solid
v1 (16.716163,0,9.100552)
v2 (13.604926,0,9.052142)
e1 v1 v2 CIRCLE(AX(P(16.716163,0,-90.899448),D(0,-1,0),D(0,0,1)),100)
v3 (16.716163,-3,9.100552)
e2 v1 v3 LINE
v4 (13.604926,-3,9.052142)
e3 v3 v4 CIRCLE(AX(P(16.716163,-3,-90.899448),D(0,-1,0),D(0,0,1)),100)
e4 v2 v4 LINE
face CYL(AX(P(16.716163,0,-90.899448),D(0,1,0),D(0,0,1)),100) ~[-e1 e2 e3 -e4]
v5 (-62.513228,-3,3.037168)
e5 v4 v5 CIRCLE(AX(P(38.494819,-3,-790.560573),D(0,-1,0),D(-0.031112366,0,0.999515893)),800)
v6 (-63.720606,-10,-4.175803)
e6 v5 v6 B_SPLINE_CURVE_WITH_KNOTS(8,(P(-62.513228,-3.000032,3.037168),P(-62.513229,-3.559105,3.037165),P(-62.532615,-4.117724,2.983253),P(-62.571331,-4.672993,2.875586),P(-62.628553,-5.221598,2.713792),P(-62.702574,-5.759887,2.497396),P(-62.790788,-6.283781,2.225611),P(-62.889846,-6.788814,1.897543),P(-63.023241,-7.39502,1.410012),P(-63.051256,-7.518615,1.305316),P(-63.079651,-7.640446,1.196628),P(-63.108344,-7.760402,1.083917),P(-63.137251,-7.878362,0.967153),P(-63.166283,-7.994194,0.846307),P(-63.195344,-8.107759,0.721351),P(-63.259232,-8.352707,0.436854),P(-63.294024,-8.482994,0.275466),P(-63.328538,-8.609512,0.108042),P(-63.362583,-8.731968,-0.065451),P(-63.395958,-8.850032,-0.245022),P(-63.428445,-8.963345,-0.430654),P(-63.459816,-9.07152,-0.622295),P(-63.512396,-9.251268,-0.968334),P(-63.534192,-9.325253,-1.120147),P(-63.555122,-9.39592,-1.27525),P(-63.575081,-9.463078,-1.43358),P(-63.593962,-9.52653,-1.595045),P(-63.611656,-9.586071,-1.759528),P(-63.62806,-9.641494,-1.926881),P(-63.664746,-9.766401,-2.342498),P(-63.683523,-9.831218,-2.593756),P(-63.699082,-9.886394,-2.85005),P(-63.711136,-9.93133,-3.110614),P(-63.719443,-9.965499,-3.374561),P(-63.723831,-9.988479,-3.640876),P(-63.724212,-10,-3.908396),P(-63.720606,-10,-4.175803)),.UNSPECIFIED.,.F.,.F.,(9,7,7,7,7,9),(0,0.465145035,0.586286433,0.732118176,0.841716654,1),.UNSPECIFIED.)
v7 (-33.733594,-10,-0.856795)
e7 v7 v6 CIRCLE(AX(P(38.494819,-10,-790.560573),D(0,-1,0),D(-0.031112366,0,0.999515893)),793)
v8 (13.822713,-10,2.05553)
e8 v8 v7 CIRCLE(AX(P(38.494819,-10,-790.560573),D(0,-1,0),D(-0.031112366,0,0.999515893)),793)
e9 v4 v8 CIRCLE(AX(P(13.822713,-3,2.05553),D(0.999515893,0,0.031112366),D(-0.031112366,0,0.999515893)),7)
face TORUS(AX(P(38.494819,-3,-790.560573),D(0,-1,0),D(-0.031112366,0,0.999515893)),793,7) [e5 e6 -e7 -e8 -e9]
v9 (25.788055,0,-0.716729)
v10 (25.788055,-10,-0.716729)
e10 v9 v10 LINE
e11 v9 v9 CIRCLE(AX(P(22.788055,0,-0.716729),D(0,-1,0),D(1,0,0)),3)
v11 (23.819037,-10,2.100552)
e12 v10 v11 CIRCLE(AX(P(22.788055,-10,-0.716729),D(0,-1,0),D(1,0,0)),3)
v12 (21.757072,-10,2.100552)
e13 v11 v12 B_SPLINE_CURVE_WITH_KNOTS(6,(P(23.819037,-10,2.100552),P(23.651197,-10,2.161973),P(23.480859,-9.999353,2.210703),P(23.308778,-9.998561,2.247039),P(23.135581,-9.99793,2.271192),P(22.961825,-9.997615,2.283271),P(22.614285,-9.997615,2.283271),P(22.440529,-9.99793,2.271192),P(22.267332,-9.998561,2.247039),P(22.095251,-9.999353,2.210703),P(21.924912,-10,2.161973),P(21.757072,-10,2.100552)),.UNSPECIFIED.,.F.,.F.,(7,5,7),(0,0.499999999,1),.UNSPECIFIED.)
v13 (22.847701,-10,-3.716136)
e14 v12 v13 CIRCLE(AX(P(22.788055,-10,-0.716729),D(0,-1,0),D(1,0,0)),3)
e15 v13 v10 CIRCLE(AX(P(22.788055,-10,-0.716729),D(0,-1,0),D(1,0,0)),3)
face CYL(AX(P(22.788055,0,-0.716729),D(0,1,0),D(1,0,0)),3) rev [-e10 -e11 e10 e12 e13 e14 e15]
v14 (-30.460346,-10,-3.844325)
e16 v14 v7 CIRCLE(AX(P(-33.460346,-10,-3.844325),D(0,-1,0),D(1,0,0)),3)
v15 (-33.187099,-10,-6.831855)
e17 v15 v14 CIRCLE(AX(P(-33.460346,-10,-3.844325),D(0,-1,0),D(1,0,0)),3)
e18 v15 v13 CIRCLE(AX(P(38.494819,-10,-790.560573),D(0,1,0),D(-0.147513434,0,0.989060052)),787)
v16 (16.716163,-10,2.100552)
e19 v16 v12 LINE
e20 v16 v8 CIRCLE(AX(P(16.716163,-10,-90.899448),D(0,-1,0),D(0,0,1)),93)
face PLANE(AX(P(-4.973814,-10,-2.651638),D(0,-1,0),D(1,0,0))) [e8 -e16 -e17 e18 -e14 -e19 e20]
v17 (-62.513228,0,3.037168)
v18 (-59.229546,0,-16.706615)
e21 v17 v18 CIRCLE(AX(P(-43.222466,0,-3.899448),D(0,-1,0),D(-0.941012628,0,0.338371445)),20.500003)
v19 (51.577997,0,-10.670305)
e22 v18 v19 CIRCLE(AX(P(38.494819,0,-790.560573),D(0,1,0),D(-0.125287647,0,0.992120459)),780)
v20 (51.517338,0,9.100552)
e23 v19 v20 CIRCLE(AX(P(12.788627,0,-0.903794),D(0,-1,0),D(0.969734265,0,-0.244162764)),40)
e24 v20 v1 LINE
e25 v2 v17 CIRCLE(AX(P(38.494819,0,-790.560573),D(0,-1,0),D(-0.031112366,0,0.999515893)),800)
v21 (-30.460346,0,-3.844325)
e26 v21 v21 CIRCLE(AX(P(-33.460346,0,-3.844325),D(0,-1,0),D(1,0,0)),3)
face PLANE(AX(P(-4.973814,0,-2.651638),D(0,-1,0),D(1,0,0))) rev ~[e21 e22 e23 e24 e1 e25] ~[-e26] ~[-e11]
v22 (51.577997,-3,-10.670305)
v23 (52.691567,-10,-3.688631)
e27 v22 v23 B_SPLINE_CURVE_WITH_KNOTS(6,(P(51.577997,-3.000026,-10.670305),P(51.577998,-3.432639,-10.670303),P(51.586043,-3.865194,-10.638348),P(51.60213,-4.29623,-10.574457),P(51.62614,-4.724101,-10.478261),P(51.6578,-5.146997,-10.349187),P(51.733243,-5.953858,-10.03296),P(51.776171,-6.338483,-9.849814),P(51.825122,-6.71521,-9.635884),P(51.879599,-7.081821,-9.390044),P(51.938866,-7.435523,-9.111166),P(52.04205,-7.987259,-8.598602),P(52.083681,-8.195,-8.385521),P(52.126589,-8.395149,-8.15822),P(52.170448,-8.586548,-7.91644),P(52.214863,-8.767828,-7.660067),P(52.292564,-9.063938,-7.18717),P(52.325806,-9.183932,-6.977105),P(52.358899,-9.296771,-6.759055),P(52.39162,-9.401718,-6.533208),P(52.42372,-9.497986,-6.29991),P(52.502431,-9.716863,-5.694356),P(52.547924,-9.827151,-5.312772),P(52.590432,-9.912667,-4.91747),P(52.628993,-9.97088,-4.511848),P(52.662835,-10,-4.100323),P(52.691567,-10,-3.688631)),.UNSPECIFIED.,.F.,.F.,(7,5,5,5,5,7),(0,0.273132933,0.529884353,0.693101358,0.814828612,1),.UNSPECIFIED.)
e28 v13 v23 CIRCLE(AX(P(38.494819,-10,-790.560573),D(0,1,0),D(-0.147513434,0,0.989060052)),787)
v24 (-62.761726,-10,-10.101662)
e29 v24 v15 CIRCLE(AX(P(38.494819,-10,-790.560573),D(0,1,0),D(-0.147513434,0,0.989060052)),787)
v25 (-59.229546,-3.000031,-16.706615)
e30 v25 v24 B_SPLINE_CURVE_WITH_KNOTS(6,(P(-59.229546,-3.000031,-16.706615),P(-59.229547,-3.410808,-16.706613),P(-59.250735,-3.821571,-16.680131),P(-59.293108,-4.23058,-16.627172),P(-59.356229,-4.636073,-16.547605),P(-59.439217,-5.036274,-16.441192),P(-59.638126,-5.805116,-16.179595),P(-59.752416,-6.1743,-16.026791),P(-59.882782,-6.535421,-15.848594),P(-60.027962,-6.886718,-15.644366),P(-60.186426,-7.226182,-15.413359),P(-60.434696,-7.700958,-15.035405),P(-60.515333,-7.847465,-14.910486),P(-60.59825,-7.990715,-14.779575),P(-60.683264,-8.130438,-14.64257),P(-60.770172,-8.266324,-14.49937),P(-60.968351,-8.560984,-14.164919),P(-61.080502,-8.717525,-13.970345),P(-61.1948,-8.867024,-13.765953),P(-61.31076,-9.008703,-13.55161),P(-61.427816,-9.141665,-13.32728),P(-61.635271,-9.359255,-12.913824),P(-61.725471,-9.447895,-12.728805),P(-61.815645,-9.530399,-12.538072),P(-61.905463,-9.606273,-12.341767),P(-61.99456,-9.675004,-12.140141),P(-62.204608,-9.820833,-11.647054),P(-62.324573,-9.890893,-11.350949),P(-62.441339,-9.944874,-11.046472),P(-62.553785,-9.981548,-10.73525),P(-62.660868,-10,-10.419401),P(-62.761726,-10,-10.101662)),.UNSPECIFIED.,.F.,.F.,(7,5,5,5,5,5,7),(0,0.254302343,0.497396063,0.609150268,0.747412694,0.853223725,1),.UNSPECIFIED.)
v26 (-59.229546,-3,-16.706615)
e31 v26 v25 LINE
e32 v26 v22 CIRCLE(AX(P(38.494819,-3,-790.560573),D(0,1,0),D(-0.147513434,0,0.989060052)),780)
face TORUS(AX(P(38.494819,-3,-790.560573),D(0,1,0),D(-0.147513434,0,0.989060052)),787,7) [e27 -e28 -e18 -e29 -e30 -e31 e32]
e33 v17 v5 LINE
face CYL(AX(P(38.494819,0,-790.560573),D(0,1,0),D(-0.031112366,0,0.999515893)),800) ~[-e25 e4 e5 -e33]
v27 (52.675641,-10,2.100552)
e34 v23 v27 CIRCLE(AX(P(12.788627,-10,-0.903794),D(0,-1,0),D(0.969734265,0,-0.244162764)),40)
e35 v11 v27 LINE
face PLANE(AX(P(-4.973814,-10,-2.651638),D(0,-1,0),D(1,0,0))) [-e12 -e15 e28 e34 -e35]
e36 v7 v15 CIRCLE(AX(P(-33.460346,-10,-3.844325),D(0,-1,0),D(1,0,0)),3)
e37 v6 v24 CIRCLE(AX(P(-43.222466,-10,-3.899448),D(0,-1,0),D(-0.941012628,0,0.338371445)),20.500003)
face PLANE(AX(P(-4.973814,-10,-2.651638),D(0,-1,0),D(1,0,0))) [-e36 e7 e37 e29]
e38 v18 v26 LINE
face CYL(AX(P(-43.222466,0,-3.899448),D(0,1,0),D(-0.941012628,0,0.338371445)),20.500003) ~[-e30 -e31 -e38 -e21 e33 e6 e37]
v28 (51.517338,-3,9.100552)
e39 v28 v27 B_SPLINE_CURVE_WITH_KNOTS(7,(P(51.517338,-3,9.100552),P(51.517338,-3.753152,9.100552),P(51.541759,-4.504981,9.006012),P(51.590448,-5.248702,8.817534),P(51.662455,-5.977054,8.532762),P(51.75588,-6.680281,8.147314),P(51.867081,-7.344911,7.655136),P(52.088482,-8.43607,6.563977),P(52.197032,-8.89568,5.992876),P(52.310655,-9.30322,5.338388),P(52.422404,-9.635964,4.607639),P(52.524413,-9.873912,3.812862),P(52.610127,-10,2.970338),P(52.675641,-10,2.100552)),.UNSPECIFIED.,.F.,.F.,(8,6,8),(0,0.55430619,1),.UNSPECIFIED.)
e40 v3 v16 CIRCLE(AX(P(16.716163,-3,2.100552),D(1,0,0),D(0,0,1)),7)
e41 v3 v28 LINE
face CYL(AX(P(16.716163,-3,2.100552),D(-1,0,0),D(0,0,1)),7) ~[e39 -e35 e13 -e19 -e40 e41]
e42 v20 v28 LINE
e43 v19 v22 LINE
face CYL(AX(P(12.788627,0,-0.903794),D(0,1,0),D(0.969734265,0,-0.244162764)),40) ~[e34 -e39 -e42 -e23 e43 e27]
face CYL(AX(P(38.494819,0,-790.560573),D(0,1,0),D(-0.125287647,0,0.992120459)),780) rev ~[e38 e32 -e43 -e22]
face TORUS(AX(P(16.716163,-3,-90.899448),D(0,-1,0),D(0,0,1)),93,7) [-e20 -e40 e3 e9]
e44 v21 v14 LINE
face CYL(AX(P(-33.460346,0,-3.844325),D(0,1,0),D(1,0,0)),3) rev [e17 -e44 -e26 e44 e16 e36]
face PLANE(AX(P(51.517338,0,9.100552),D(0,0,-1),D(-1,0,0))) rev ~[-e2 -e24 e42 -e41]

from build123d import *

# Parameters (mm, degrees)
F0_R        = 3
F1_DEPTH    = 10
F2_T1_DEPTH = 52.3011751173
F2_T4_ANGLE = 6.7239804363
F2_T6_ANGLE = 10.729424982
F2_T8_ANGLE = 1.7828949869


# Not quite as in the source:
# - a fillet or chamfer that OpenCascade refuses, or shapes differently, is made with other operations: its cross-section is extruded or revolved along the edge and cut away or added


with BuildPart() as f1:
    # F0 (on Front) → F1 (new body)
    with BuildSketch(Plane.XZ):
        with BuildLine():
            ThreePointArc((16.7161625637, 9.1005522793), (15.1603559483, 9.0884488757), (13.604925944, 9.0521415948))
            ThreePointArc((13.604925944, 9.0521415948), (-24.5259537531, 6.9533029462), (-62.5132279063, 3.0371680453))
            ThreePointArc((-62.5132279063, 3.0371680453), (-63.4446975244, -7.2627028514), (-59.2295458713, -16.7066147888))
            ThreePointArc((-59.2295458713, -16.7066147888), (-3.9332598443, -11.7153648591), (51.5779973344, -10.6703047235))
            ThreePointArc((51.5779973344, -10.6703047235), (52.7884384629, -0.7810693697), (51.517337681, 9.1005522793))
            Line((51.517337681, 9.1005522793), (16.7161625637, 9.1005522793))
        make_face()
        with Locations((-33.4603461426, -3.8443253384)):
            Circle(F0_R, mode=Mode.SUBTRACT)
        with Locations((22.7880547631, -0.7167291473)):
            Circle(F0_R, mode=Mode.SUBTRACT)
    extrude(amount=F1_DEPTH)

    # F2: fillet of radius 7 on 4 edges, made by hand

    # F2_s2 → F2_t1 (cut)
    with BuildSketch(Plane.YZ.offset(16.7161625637)):
        with BuildLine():
            ThreePointArc((-3, 9.1005522793), (-7.9497474683, 7.0502997476), (-10, 2.1005522793))
            Line((-10, 2.1005522793), (-10, 9.1005522793))
            Line((-10, 9.1005522793), (-3, 9.1005522793))
        make_face()
    extrude(amount=F2_T1_DEPTH, mode=Mode.SUBTRACT)

    # F2_s3 → F2_t4 (revolve, cut)
    with BuildSketch(Plane(origin=(13.8732538603, 0, 0.4318388106), x_dir=(0, 1, 0), z_dir=(0.9995158932, 0, 0.0311123662))):
        with BuildLine():
            ThreePointArc((-3, 8.624477953), (-7.9497474683, 6.5742254213), (-10, 1.624477953))
            Line((-10, 1.624477953), (-10, 8.624477953))
            Line((-10, 8.624477953), (-3, 8.624477953))
        make_face()
    revolve(axis=Axis((38.4948189015, -10, -790.5605729296), (0, -1, 0)), revolution_arc=F2_T4_ANGLE, mode=Mode.SUBTRACT)

    # F2_s5 → F2_t6 (revolve, cut)
    with BuildSketch(Plane(origin=(-77.6853434409, 0, -11.5863862591), x_dir=(0, 1, 0), z_dir=(-0.9890600521, 0, -0.1475134342))):
        with BuildLine():
            ThreePointArc((-3, 7.5903844134), (-7.9497474683, 5.5401318817), (-10, 0.5903844134))
            Line((-10, 0.5903844134), (-10, 7.5903844134))
            Line((-10, 7.5903844134), (-3, 7.5903844134))
        make_face()
    revolve(axis=Axis((38.4948189015, -10, -790.5605729293), (0, 1, 0)), revolution_arc=F2_T6_ANGLE, mode=Mode.SUBTRACT)

    # F2_s7 → F2_t8 (revolve, cut)
    with BuildSketch(Plane.YZ.offset(16.7161625637)):
        with BuildLine():
            ThreePointArc((-3, 9.1005522793), (-7.9497474683, 7.0502997476), (-10, 2.1005522793))
            Line((-10, 2.1005522793), (-10, 9.1005522793))
            Line((-10, 9.1005522793), (-3, 9.1005522793))
        make_face()
    revolve(axis=Axis((16.7161625637, -10, -90.8994477206), (0, -1, 0)), revolution_arc=F2_T8_ANGLE, mode=Mode.SUBTRACT)


solid = f1.part
